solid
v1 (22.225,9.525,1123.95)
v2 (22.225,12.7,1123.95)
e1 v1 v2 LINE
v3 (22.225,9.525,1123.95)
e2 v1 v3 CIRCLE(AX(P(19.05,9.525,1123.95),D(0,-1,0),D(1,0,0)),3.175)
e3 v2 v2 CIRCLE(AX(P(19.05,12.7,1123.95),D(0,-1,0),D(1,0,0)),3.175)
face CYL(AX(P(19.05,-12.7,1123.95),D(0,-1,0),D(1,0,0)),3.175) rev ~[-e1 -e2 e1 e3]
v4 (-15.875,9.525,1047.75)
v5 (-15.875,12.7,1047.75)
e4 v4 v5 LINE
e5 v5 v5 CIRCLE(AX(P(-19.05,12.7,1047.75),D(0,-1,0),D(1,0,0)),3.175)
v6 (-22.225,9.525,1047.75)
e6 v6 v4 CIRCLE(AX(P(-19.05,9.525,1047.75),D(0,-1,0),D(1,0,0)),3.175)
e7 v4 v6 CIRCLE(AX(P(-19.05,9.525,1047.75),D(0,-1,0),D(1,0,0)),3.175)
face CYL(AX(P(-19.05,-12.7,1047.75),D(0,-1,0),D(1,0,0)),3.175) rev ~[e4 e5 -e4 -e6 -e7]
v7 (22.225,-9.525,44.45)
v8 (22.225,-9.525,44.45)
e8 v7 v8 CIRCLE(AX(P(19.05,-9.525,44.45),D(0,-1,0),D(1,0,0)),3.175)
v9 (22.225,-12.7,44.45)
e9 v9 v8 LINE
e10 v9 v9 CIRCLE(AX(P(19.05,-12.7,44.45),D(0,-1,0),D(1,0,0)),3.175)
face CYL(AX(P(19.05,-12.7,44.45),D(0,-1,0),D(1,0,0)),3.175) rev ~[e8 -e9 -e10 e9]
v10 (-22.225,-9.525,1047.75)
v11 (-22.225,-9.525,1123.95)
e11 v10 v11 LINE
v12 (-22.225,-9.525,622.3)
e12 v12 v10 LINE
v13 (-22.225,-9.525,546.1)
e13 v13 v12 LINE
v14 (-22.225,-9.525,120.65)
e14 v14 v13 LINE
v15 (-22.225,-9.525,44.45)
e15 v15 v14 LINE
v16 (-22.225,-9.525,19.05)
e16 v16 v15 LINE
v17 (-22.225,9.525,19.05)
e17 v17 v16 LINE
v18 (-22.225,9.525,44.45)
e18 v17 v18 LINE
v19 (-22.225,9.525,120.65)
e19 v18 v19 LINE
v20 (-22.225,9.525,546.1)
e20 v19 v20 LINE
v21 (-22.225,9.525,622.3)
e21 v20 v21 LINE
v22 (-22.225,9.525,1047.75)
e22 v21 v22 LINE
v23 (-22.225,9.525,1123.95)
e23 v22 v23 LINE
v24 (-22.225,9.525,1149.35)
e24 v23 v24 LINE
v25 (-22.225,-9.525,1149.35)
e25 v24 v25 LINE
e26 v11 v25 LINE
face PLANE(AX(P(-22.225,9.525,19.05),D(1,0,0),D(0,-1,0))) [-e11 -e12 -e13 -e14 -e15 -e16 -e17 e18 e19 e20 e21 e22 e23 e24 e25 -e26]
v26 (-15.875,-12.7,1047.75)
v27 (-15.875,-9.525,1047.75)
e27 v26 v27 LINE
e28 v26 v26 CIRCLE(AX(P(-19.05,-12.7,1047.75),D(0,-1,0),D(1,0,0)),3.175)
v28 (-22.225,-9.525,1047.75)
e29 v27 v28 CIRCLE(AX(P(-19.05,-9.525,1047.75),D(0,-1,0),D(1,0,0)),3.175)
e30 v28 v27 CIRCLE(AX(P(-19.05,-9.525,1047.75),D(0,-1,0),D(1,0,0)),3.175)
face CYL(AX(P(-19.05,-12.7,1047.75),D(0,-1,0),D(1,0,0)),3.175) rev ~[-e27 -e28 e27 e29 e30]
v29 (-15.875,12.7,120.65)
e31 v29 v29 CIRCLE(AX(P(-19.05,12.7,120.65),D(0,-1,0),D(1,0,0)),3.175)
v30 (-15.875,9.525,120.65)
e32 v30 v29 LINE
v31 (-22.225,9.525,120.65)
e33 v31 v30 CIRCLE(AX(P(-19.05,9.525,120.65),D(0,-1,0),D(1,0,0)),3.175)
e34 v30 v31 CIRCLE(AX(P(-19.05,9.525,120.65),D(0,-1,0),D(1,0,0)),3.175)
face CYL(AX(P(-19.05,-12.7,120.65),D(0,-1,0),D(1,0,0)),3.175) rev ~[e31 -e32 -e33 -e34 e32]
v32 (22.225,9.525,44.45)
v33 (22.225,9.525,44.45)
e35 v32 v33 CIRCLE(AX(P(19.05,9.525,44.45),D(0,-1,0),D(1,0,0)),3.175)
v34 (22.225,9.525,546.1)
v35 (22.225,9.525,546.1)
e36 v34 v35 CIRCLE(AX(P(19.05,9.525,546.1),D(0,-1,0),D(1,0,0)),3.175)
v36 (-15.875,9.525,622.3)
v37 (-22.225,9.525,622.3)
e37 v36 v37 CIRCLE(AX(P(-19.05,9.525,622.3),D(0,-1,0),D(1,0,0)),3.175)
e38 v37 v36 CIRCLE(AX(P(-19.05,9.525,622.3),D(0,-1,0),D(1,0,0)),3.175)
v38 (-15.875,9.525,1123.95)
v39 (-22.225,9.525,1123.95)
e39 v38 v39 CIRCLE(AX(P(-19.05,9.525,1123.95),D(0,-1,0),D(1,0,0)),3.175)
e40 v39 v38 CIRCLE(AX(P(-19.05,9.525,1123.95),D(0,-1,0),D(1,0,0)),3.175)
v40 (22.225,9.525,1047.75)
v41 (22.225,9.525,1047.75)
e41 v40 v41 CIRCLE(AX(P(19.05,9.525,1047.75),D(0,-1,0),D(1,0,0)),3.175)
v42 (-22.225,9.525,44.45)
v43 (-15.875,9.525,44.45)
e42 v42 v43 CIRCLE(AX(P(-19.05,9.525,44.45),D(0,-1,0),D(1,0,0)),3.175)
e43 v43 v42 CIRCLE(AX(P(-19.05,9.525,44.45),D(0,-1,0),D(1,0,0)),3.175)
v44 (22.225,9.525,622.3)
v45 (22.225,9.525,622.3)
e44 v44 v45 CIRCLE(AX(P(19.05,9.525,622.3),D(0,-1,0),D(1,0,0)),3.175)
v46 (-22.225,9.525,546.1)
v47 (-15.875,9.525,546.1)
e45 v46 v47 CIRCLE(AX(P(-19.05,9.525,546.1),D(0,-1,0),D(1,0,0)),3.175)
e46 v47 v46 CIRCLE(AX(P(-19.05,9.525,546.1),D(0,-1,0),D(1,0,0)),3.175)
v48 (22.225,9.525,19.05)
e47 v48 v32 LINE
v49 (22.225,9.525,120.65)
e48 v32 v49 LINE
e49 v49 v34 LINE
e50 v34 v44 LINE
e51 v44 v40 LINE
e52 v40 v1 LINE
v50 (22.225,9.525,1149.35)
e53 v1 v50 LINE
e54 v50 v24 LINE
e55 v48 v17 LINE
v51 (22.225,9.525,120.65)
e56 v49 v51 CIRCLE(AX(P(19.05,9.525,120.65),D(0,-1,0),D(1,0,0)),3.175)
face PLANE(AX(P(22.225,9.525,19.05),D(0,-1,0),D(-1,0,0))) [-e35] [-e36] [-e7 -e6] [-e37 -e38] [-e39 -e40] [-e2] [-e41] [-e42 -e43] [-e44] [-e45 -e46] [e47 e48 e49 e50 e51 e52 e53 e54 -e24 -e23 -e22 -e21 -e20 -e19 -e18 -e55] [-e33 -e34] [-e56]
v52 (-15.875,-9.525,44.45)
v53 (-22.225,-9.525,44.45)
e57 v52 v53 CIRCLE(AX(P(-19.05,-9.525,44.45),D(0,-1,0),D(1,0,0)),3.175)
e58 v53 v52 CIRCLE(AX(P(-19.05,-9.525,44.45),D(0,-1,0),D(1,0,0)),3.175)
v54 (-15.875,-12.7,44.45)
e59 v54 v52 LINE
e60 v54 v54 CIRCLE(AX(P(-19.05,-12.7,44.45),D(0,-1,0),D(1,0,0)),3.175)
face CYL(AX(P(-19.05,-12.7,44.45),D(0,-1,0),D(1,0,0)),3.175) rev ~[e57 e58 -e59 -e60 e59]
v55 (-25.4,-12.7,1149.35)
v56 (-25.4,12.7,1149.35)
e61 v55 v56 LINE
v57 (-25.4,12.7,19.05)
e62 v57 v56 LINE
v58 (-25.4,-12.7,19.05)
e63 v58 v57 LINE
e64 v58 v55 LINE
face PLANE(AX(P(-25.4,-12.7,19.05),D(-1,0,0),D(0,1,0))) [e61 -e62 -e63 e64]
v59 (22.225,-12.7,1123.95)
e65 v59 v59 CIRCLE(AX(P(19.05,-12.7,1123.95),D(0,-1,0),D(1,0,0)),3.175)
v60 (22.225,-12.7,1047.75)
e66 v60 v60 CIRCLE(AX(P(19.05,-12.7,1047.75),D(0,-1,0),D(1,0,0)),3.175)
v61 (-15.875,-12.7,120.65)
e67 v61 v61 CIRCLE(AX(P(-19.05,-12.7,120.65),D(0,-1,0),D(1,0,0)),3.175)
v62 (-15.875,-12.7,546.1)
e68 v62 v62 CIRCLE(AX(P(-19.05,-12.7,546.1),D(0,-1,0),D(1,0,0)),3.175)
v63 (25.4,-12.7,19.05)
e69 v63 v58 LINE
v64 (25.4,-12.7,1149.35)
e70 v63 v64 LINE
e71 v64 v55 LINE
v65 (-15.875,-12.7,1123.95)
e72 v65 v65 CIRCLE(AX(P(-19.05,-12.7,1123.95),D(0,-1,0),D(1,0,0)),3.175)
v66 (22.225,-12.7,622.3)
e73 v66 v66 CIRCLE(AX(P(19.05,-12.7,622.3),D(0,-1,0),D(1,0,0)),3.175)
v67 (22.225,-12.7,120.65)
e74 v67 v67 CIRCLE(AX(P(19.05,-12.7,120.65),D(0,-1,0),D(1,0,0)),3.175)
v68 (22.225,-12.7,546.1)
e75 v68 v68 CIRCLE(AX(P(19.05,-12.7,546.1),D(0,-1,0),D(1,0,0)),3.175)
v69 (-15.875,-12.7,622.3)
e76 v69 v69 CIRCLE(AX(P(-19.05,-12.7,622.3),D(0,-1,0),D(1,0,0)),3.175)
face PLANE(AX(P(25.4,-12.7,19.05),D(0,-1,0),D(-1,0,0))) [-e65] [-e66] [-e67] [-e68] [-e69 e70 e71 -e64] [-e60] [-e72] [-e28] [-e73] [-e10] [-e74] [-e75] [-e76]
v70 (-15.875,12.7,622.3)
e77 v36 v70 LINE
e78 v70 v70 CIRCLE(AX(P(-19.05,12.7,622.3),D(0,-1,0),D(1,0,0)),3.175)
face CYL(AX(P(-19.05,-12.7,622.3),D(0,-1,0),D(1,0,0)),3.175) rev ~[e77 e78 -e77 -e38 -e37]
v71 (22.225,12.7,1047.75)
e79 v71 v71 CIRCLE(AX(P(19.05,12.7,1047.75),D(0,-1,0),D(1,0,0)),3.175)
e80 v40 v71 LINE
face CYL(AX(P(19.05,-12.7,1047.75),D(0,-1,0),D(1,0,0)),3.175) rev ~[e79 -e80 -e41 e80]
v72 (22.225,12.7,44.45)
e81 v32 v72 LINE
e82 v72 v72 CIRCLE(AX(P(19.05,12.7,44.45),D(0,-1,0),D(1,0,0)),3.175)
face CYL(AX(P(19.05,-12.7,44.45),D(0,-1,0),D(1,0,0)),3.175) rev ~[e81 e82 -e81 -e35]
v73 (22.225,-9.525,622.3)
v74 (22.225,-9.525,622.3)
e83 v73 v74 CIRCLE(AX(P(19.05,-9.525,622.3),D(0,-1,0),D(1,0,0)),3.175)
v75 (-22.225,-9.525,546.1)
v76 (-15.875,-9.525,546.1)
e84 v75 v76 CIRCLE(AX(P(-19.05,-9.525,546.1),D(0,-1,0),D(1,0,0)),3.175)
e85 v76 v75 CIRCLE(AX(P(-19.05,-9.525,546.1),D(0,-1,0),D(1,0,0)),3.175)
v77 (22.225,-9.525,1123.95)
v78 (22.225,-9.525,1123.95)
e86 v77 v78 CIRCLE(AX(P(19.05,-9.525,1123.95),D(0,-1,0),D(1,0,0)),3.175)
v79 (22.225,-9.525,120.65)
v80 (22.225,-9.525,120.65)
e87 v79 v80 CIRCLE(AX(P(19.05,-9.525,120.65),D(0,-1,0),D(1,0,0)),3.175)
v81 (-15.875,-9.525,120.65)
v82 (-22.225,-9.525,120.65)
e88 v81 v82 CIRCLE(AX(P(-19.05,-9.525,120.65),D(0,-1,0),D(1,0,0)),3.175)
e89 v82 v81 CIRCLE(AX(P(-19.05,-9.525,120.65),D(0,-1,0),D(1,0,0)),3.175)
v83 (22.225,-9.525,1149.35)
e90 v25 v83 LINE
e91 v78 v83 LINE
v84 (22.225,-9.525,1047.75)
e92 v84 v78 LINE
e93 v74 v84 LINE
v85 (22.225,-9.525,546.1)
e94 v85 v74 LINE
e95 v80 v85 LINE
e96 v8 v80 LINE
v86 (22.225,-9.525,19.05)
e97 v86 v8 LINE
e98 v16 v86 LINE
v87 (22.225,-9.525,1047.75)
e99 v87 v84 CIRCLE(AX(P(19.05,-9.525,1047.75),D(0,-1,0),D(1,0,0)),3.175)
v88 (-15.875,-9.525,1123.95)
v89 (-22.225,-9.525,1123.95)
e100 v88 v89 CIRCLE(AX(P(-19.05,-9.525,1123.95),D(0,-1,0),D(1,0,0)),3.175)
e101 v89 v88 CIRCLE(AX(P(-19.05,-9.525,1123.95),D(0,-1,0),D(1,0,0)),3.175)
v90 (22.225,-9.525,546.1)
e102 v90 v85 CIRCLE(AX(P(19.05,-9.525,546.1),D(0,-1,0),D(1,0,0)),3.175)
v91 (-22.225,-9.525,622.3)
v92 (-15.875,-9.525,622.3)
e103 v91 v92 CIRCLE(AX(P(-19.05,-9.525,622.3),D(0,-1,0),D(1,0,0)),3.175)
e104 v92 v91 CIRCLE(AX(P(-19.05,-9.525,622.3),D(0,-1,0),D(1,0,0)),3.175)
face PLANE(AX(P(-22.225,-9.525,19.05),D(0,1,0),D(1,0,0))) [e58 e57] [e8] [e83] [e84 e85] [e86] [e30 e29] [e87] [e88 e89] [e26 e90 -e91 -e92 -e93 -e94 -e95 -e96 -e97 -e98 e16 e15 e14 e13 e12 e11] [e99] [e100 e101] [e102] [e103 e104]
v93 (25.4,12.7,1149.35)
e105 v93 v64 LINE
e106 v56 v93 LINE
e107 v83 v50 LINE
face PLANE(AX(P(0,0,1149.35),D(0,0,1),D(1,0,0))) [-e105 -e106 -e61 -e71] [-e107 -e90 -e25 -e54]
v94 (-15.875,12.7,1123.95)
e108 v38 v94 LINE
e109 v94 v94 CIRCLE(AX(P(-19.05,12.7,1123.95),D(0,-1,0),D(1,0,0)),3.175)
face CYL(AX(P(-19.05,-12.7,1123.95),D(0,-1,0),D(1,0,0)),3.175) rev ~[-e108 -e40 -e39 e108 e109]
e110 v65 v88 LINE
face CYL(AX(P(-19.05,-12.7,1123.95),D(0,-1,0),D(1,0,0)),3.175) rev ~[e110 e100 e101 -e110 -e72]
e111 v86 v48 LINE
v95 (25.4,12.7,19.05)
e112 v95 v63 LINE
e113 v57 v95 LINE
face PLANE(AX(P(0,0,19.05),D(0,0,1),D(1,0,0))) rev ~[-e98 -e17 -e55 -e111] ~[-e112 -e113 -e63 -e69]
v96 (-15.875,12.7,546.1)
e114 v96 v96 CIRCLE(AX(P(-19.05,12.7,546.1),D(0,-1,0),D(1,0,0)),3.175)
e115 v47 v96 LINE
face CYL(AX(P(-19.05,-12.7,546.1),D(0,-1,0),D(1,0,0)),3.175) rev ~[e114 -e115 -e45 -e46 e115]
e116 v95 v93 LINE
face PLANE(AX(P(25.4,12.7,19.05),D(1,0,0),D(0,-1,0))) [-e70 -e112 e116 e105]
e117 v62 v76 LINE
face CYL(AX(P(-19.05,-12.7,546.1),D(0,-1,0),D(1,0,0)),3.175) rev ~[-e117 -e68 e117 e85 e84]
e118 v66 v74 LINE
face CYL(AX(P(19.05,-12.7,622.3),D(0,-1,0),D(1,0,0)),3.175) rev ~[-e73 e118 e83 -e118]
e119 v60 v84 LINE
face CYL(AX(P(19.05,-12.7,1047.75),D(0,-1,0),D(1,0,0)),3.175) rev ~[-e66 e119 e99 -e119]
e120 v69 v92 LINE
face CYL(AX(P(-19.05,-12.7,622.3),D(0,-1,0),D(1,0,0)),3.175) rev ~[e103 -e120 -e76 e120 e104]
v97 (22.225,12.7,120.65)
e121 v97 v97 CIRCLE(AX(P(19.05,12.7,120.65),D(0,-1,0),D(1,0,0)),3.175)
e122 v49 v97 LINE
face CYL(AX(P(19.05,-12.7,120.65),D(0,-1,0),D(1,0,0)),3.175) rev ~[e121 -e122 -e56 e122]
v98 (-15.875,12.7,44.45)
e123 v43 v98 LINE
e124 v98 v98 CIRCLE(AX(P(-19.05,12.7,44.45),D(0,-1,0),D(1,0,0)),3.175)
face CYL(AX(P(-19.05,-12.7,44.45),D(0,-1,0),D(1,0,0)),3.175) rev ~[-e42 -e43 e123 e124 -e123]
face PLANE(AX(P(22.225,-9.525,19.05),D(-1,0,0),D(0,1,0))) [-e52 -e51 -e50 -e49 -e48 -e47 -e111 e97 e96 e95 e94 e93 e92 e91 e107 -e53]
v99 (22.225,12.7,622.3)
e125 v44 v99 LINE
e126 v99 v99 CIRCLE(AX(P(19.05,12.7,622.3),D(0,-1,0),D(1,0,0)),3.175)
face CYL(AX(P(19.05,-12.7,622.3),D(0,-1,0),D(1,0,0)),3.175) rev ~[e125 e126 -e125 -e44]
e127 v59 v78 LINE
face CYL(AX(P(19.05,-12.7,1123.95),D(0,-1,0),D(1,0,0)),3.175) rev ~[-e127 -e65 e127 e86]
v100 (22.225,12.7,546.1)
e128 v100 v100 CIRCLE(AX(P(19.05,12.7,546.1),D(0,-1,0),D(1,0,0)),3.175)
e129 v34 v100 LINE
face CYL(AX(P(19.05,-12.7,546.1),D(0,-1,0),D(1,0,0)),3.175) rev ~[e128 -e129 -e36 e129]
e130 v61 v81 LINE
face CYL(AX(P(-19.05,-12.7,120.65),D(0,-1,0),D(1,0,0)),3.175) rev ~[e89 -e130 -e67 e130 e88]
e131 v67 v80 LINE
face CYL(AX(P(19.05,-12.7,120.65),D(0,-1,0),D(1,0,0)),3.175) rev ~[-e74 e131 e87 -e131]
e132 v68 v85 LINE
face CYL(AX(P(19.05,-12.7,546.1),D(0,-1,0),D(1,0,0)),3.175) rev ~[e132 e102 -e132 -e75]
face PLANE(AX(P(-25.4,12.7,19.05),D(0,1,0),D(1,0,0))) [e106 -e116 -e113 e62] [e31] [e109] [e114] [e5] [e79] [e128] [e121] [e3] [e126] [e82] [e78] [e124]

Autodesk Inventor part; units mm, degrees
sketch "Caster Mount Pattern" plane through (0, 0, 0) normal (0, 0, 1) x (1, 0, 0)
  line L0 (-94.6641, 144.1787) -> (-56.5641, 144.1787) construction
  line L1 (-56.5641, 144.1787) -> (-56.5641, 67.9787) construction
  line L2 (-56.5641, 67.9787) -> (-94.6641, 67.9787) construction
  line L3 (-94.6641, 67.9787) -> (-94.6641, 144.1787) construction
  circle A0 centre (-94.6641, 144.1787) radius 3.175
  circle A1 centre (-56.5641, 144.1787) radius 3.175
  circle A2 centre (-56.5641, 67.9787) radius 3.175
  circle A3 centre (-94.6641, 67.9787) radius 3.175
  point P0 (-75.6141, 93.3787)
  dimension "d11" = 6.35
  dimension "d12" = 38.1
  dimension "d13" = 76.2
ref_plane "Start Plane" through (0, 0, 19.05) normal (0, 0, 1) x (1, 0, 0)
ref_plane "End Plane" through (0, 0, 1149.35) normal (0, 0, 1) x (1, 0, 0)
sketch "Sketch" plane through (0, 0, 0) normal (0, 0, 1) x (1, 0, 0)
  line L0 (-25.4, 12.7) -> (25.4, 12.7)
  line L1 (25.4, 12.7) -> (25.4, -12.7)
  line L2 (25.4, -12.7) -> (-25.4, -12.7)
  line L3 (-25.4, -12.7) -> (-25.4, 12.7)
  line L4 (22.225, 9.525) -> (-22.225, 9.525)
  line L5 (-22.225, 9.525) -> (-22.225, -9.525)
  line L6 (-22.225, -9.525) -> (22.225, -9.525)
  line L7 (22.225, -9.525) -> (22.225, 9.525)
  point P0 (0, 0)
  point P1 (0, 12.7)
  point P2 (-25.4, 0)
  dimension "d0" = 50.8
  dimension "d1" = 25.4
  dimension "d2" = 3.175
extrude "Body" add sketch "Sketch" along normal up to surface (1130.3 mm away) from surface at 19.05
sketch "Sketch2" plane through (0, 0, 0) normal (0, 0, 1) x (1, 0, 0)
  line L0 (0, 0) -> (10, 0)
ref_plane "Work Plane3" through (0, 0, 0) normal (0, -1, 0) x (1, 0, 0)
sketch "Sketch3" plane through (0, 0, 0) normal (0, -1, 0) x (1, 0, 0)
  line L0 (-2, 19.05) -> (12, 19.05)
  line L1 (-2, 1149.35) -> (12, 1149.35)
  dimension "d10" = 1130.3
ref_plane "Work Plane4" through (-6.35, -19.05, 19.05) normal (0, 0, -1) x (-1, 0, 0)
split "Split1" plane through (-6.35, -19.05, 19.05) removes the side toward (0, 0, -1)
ref_plane "Work Plane5" through (755.65, -19.05, 1149.35) normal (0, 0, 1) x (1, 0, 0)
split "Split2" plane through (755.65, -19.05, 1149.35) removes the side toward (0, 0, 1)
sketch "Sketch4" plane through (-25.4, -12.7, 19.05) normal (0, -1, 0) x (1, 0, 0)
  line L0 (50.8, 0) -> (0, 0) projected
  line L1 (50.8, 0) -> (50.8, 1130.3) projected
  line L2 (50.8, 1130.3) -> (0, 1130.3) projected
  line L3 (6.35, 101.6) -> (44.45, 101.6) construction
  line L4 (44.45, 101.6) -> (44.45, 25.4) construction
  line L5 (44.45, 25.4) -> (6.35, 25.4) construction
  line L6 (6.35, 25.4) -> (6.35, 101.6) construction
  circle A0 centre (6.35, 101.6) radius 3.175
  circle A1 centre (44.45, 101.6) radius 3.175
  circle A2 centre (44.45, 25.4) radius 3.175
  circle A3 centre (6.35, 25.4) radius 3.175
  line L7 (6.35, 603.25) -> (44.45, 603.25) construction
  line L8 (44.45, 603.25) -> (44.45, 527.05) construction
  line L9 (44.45, 527.05) -> (6.35, 527.05) construction
  line L10 (6.35, 527.05) -> (6.35, 603.25) construction
  circle A4 centre (6.35, 603.25) radius 3.175
  circle A5 centre (44.45, 603.25) radius 3.175
  circle A6 centre (44.45, 527.05) radius 3.175
  circle A7 centre (6.35, 527.05) radius 3.175
  line L11 (6.35, 1104.9) -> (44.45, 1104.9) construction
  line L12 (44.45, 1104.9) -> (44.45, 1028.7) construction
  line L13 (44.45, 1028.7) -> (6.35, 1028.7) construction
  line L14 (6.35, 1028.7) -> (6.35, 1104.9) construction
  circle A8 centre (6.35, 1104.9) radius 3.175
  circle A9 centre (44.45, 1104.9) radius 3.175
  circle A10 centre (44.45, 1028.7) radius 3.175
  circle A11 centre (6.35, 1028.7) radius 3.175
  point P0 (25.4, -19.05)
  point P1 (25.4, 101.6)
  point P2 (25.4, 527.05)
  point P3 (25.4, 603.25)
  point P4 (25.4, 1028.7)
  point P5 (25.4, 25.4)
  point P6 (25.4, 0)
  point P7 (50.8, 565.15)
  point P8 (44.45, 565.15)
  dimension "d14" = 25.4
  dimension "d15" = 25.4
extrude "Extrusion3" cut sketch "Sketch4" against normal up to surface (25.4 mm away)
equation "\"d15\" = d14"
equation "\"G_OFFSET_START\" = -19.05"
equation "\"G_OFFSET_END\" = -19.05"
equation "\"d5\" = -G_OFFSET_START"
equation "\"d6\" = length + G_OFFSET_END"
equation "\"G_L\" = 1130.3"
equation "\"length\" = 1168.4"
properties part number "2x1x.125 Tube" material "Aluminum-6061"
